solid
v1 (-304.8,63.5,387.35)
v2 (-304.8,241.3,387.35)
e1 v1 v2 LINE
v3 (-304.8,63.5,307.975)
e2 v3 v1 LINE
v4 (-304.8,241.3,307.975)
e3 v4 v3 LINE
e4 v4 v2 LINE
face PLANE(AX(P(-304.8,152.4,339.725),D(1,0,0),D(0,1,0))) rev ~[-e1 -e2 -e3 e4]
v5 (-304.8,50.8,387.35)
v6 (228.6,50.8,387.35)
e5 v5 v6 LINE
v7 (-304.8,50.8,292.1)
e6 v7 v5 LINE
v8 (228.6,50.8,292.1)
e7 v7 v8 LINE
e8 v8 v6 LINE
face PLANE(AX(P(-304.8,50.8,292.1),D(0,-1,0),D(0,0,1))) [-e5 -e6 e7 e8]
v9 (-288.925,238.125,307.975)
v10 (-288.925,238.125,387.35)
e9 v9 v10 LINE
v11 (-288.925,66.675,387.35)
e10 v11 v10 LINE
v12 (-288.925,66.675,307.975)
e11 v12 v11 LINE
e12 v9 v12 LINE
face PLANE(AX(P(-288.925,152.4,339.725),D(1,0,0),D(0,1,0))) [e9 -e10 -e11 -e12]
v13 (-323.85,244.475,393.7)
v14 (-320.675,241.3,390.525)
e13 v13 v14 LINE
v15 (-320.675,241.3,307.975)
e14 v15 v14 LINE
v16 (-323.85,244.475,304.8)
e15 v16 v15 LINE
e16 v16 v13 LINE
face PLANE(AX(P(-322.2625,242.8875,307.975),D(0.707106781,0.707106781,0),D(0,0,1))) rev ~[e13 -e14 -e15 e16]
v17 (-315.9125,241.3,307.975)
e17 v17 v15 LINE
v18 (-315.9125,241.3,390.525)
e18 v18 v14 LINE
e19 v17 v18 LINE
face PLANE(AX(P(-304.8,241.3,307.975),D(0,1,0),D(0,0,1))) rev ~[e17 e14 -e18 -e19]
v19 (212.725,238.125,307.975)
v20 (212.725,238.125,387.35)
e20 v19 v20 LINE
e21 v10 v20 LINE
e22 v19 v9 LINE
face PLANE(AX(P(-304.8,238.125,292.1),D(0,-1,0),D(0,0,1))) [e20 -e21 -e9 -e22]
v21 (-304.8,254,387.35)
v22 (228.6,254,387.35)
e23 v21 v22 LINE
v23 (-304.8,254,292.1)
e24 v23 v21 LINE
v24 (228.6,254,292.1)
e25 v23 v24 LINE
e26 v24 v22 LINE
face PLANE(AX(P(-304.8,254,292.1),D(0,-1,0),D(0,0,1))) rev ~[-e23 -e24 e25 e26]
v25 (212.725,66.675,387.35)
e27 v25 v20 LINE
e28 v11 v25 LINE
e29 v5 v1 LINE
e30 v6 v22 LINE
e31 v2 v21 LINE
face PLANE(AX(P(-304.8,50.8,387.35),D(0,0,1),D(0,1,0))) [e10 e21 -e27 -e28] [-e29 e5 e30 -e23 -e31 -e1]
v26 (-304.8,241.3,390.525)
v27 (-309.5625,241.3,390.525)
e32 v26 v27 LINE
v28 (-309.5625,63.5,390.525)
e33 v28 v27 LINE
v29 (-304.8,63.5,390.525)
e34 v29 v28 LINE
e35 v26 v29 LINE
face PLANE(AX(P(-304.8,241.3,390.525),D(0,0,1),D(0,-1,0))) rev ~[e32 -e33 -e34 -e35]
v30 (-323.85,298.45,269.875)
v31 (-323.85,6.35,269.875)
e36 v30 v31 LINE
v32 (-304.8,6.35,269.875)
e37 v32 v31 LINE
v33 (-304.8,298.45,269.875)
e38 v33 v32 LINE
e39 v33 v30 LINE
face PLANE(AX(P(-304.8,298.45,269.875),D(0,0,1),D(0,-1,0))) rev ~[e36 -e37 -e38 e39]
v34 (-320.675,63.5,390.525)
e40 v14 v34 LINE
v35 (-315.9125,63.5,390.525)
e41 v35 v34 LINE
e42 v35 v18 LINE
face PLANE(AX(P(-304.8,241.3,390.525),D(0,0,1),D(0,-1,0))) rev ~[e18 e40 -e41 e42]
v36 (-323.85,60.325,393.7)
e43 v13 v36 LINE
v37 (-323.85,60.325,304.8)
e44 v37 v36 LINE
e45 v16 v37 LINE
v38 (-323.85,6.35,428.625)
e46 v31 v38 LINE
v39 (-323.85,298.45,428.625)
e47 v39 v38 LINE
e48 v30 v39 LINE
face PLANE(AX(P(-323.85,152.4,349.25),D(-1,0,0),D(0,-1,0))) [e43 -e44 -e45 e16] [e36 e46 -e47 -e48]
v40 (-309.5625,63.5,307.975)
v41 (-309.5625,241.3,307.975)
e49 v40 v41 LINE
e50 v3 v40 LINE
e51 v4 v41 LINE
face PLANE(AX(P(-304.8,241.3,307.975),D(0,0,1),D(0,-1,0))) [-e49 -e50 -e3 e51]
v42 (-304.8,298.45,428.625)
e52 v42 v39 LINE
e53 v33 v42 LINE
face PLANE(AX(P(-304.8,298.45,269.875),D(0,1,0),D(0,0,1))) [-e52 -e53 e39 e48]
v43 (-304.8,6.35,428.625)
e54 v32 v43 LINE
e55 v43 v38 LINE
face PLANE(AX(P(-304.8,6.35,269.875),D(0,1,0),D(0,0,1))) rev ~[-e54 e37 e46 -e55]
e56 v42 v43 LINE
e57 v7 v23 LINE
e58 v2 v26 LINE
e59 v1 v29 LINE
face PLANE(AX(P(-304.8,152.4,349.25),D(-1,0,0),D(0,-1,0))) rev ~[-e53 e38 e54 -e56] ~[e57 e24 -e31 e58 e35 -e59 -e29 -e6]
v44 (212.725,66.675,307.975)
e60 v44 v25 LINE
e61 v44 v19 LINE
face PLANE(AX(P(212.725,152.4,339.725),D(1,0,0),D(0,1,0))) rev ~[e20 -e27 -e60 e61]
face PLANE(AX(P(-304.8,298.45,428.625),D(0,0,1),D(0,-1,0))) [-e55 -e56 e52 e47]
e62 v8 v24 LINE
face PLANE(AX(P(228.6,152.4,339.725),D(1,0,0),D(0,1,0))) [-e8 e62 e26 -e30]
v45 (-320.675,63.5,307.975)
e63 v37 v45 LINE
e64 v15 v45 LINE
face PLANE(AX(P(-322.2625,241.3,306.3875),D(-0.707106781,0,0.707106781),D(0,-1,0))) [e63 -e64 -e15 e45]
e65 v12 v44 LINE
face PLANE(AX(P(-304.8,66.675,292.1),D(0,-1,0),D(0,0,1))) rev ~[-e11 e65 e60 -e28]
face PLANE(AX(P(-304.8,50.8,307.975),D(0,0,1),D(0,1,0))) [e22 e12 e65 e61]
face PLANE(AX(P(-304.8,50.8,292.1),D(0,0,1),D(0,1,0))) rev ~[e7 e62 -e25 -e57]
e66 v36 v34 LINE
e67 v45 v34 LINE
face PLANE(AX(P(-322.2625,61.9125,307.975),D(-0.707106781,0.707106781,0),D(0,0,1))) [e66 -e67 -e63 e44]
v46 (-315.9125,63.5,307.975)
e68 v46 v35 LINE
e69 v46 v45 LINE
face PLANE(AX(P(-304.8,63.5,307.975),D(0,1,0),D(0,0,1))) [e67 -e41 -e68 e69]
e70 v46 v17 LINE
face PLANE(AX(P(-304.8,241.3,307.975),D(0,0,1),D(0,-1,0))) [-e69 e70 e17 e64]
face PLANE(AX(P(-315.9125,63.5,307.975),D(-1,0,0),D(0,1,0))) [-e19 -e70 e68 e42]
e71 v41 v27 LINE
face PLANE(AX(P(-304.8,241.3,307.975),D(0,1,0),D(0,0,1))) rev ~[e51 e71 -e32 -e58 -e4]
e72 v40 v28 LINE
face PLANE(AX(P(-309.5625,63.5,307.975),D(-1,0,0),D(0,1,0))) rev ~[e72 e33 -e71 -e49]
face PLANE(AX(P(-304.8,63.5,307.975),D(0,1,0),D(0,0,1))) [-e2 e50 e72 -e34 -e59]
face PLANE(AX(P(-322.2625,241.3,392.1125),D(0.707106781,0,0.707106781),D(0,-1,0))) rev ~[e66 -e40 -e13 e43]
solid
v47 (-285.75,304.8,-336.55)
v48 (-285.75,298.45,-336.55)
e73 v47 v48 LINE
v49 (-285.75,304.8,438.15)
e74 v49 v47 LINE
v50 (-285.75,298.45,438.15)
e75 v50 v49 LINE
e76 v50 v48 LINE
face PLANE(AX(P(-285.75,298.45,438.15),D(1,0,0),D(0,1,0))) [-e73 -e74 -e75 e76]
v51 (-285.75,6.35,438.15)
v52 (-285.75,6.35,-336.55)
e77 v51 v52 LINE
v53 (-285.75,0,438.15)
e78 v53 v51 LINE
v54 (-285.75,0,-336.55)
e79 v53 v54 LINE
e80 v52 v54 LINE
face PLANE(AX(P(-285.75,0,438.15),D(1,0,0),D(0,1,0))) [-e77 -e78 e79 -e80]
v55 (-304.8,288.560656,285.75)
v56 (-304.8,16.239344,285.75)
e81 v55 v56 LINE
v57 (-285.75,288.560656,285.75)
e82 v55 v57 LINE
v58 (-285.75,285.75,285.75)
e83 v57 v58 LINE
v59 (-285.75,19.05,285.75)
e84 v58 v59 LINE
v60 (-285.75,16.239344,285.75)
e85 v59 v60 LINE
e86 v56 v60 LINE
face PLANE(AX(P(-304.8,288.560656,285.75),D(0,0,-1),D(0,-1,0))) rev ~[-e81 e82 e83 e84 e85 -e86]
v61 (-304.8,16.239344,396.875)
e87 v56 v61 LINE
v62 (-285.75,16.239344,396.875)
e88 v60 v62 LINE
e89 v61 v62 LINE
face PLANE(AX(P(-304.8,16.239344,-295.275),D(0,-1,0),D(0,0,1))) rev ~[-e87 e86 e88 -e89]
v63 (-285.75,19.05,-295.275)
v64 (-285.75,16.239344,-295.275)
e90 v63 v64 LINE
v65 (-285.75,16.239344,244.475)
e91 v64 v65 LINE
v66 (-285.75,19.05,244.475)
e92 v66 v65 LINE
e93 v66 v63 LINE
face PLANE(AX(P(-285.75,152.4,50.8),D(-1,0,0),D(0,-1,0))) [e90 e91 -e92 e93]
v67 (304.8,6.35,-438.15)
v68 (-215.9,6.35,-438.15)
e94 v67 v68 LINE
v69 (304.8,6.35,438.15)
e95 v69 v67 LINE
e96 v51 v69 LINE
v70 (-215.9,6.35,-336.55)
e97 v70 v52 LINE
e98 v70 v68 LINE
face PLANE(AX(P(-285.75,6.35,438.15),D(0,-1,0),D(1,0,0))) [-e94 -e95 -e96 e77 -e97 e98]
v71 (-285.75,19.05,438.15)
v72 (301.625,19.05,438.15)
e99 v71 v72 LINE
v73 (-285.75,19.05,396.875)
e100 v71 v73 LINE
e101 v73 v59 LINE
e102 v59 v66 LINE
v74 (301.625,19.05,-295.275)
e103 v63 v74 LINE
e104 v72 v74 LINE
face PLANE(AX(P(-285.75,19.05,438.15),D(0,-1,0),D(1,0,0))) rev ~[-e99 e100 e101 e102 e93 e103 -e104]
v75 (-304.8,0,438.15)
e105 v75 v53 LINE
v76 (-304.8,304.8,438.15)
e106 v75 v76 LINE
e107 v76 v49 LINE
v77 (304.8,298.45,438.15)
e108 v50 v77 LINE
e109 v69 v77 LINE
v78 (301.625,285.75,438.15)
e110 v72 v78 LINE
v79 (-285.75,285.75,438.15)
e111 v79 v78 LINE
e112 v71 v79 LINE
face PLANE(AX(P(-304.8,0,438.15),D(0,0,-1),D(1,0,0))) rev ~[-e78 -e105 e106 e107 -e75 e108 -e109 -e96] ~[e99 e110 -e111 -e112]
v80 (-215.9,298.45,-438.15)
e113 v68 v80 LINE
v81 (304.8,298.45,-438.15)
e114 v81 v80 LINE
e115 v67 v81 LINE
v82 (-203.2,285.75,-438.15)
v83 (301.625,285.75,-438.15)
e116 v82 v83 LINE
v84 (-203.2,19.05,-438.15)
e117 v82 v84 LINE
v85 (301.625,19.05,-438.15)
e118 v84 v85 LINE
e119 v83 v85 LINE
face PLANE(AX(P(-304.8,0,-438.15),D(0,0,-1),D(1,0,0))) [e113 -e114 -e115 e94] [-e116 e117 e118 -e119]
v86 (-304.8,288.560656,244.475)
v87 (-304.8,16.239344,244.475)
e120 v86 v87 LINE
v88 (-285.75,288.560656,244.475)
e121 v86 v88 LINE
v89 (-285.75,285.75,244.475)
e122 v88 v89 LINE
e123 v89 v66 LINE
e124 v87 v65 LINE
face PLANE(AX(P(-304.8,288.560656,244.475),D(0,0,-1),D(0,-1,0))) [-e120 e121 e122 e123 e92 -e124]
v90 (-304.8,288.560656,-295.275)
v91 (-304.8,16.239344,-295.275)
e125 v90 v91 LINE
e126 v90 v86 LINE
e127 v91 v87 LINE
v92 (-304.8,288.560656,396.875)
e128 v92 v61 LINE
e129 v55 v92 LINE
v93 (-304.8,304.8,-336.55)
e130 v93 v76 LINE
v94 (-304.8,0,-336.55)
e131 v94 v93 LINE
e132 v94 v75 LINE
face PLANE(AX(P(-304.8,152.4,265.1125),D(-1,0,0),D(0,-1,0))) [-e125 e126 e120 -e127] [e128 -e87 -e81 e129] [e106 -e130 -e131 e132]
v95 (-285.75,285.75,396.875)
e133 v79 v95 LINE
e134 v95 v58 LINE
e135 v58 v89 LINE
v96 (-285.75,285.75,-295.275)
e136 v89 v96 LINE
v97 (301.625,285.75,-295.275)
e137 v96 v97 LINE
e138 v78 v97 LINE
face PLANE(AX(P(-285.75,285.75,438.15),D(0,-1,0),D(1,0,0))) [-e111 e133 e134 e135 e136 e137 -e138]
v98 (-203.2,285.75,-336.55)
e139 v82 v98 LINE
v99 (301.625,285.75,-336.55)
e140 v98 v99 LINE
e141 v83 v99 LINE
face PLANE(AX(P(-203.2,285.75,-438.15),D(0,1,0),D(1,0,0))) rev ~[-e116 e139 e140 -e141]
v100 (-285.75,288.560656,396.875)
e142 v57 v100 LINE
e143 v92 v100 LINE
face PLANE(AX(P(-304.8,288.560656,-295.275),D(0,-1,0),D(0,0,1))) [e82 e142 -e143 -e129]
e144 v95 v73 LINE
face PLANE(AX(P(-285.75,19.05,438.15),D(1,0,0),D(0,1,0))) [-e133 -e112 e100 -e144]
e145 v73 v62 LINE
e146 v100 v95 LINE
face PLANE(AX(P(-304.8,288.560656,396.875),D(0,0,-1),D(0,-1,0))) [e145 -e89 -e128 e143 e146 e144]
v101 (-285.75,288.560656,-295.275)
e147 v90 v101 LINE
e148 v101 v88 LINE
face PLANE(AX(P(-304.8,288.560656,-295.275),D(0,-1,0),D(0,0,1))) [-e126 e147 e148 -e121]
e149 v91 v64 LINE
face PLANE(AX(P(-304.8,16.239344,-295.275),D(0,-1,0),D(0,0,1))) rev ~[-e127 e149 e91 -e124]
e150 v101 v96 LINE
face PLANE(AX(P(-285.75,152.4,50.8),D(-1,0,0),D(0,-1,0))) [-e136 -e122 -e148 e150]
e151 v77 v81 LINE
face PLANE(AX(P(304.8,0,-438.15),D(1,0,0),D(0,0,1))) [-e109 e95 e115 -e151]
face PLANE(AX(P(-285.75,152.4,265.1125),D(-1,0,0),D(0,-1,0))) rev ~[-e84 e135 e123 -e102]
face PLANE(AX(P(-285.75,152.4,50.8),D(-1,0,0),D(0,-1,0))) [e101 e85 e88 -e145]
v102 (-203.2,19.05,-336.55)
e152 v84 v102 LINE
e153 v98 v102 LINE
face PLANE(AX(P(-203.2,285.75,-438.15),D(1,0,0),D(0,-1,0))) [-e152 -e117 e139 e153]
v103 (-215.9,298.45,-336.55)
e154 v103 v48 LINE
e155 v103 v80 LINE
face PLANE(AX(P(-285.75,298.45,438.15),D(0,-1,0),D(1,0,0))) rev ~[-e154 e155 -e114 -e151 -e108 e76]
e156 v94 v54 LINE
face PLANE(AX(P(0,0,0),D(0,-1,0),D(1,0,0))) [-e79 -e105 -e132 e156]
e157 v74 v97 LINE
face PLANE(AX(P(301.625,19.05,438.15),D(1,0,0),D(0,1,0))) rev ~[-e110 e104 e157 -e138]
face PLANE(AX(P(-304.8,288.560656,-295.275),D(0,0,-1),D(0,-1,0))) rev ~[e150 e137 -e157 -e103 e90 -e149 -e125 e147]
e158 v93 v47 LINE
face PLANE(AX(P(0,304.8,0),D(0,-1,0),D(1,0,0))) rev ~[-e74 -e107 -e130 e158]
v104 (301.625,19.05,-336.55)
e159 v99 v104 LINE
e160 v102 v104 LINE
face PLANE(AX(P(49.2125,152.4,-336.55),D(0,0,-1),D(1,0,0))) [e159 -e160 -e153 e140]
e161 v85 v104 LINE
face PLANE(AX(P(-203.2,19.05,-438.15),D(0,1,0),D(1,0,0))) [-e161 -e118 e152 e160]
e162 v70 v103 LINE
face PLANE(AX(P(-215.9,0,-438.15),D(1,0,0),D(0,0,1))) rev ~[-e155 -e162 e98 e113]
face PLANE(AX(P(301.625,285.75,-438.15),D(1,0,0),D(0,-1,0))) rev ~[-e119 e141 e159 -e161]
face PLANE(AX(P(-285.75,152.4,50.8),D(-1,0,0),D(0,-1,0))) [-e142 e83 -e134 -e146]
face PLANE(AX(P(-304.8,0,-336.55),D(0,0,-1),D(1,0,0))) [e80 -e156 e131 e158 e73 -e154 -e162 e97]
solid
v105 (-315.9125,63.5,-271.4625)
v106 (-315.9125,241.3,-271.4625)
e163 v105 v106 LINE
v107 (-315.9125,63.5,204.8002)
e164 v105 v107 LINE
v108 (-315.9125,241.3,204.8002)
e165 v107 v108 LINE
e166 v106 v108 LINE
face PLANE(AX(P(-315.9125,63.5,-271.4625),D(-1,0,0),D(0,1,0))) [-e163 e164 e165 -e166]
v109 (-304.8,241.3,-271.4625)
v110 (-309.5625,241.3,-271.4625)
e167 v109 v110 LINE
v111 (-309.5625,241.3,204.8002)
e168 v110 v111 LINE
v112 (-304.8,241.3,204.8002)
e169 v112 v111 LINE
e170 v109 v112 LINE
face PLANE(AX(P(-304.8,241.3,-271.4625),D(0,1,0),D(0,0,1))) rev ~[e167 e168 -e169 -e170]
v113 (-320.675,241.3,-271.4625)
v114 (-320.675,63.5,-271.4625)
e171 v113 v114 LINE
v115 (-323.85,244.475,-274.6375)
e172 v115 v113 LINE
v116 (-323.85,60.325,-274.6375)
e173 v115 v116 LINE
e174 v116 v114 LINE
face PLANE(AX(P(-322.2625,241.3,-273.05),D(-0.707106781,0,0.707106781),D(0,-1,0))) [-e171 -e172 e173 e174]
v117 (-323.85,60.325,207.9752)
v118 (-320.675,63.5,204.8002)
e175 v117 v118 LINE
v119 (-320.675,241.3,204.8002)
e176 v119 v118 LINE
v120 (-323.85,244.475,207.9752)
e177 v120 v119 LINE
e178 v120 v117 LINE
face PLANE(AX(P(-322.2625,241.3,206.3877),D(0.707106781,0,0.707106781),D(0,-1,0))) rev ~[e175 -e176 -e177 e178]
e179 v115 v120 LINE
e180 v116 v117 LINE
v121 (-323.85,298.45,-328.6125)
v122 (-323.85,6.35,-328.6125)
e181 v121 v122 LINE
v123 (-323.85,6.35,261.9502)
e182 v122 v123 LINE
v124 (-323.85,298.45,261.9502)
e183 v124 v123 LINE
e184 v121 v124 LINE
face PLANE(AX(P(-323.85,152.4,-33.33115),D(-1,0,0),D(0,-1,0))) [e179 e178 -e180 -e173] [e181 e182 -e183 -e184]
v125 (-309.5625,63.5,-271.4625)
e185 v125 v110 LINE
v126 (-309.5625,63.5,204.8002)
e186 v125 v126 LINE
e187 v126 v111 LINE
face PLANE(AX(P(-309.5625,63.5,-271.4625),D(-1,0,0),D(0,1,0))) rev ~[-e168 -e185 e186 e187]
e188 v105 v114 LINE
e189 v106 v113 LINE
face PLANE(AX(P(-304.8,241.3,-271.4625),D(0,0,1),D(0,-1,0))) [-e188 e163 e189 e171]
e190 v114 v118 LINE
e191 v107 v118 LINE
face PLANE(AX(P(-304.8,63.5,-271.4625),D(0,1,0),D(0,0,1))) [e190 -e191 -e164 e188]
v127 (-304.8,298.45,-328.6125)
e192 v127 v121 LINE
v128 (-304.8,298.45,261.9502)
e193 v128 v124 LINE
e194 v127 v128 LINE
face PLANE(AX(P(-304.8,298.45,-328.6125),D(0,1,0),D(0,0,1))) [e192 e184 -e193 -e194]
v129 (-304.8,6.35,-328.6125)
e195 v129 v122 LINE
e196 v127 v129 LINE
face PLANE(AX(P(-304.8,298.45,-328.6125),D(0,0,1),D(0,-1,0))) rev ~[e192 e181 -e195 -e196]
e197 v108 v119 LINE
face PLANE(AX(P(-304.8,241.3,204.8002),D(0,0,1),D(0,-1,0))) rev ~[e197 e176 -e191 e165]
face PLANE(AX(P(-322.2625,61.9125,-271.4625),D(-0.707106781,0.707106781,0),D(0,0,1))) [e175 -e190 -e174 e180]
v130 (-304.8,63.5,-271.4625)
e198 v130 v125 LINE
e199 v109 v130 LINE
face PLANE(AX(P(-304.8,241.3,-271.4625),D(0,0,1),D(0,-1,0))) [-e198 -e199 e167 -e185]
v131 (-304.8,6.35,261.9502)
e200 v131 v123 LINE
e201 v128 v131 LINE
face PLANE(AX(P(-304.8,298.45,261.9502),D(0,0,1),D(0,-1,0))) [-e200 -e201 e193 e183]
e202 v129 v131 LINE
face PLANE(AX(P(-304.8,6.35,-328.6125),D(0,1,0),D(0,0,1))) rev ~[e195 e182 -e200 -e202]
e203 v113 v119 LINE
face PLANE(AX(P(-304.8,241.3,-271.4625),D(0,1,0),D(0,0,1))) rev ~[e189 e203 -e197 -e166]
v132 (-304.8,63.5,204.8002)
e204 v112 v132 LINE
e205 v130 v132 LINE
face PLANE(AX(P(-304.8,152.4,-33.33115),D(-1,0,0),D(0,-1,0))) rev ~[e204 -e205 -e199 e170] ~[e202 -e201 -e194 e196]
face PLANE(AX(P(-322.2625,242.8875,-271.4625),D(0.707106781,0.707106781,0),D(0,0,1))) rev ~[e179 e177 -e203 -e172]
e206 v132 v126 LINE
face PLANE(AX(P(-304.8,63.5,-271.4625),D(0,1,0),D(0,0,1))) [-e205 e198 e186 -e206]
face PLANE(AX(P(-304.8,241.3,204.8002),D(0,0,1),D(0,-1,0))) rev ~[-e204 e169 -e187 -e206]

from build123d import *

# Parameters (mm, degrees)
F0_W          = 609.6
F0_H          = 876.3
F1_DEPTH      = 304.8
F2_W          = 88.9
F2_H          = 101.6
F3_DEPTH      = 304.801
F4_W          = 272.3213114754
F4_H          = 692.15
F5_DEPTH      = 19.05
F6_W          = 590.55
F6_H          = 6.35
F7_DEPTH      = 876.301
F8_W          = 587.375
F8_H          = 266.7
F9_DEPTH      = 733.425
F10_W         = 272.3213114754
F10_H         = 41.275
F11_DEPTH     = 19.05
F12_W         = 292.1
F12_H         = 590.5627
F12_W_2       = 177.8
F12_H_2       = 476.2627
F13_DEPTH     = 19.05
F14_W         = 6.35
F14_H         = 177.8
F15_DEPTH     = 476.2627
F16_SIZE      = 3.175
F17_W         = 292.1
F17_H         = 158.75
F17_W_2       = 177.8
F17_H_2       = 82.55
F18_DEPTH     = 19.05
F19_W         = 6.35
F19_H         = 177.8
F20_DEPTH     = 82.55
F21_SIZE      = 3.175
F22_W         = 504.825
F22_H         = 266.7
F23_DEPTH     = 101.6
F24_W         = 203.2
F24_H         = 95.25
F25_DEPTH     = 533.4
F26_T         = 15.875
F26_T3_DEPTH  = 37.249261314
F26_T5_DEPTH  = 37.249261314
F26_T7_DEPTH  = 37.249261314
F26_T9_DEPTH  = 37.249261314
F26_T11_DEPTH = 36.5125
F26_T13_DEPTH = 209.55
F26_T15_DEPTH = 114.3
F26_T17_DEPTH = 127
F26_T19_DEPTH = 234.95
F26_T21_DEPTH = 111.125
F26_T23_DEPTH = 36.5125


# Not quite as in the source:
# - a shell that OpenCascade refuses in one call is made with other operations: the cavity is built on its own and cut out


with BuildPart() as f1:
    # F0 (on Front) → F1 (new body)
    with BuildSketch(Plane.XZ):
        Rectangle(F0_W, F0_H)
    extrude(amount=-F1_DEPTH)

    # F2 (on face) → F3 (cut, through all)
    with BuildSketch(Plane.XZ):
        with Locations((-260.35, -387.35)):
            Rectangle(F2_W, F2_H)
    extrude(amount=-F3_DEPTH, mode=Mode.SUBTRACT)

    # F4 (on face) → F5 (cut)
    with BuildSketch(Plane(origin=(-304.8, 0, 0), x_dir=(0, -1, 0), z_dir=(-1, 0, 0))):
        with Locations((-152.4, 50.8)):
            Rectangle(F4_W, F4_H)
    extrude(amount=-F5_DEPTH, mode=Mode.SUBTRACT)

    # F6 (on face) → F7 (cut, through all)
    with BuildSketch(Plane.XY.offset(438.15)):
        with Locations((9.525, 301.625)):
            Rectangle(F6_W, F6_H)
        with Locations((9.525, 3.175)):
            Rectangle(F6_W, F6_H)
    extrude(amount=-F7_DEPTH, mode=Mode.SUBTRACT)

    # F8 (on face) → F9 (cut, through all)
    with BuildSketch(Plane.XY.offset(438.15)):
        with Locations((7.9375, 152.4)):
            Rectangle(F8_W, F8_H)
    extrude(amount=-F9_DEPTH, mode=Mode.SUBTRACT)

    # F10 (on face) → F11 (join, through all)
    with BuildSketch(Plane(origin=(-304.8, 0, 0), x_dir=(0, -1, 0), z_dir=(-1, 0, 0))):
        with Locations((-152.4, 265.1125)):
            Rectangle(F10_W, F10_H)
    extrude(amount=-F11_DEPTH)

    # F22 (on face) → F23 (cut)
    with BuildSketch(Plane(origin=(0, 0, -438.15), x_dir=(1, 0, 0), z_dir=(0, 0, -1))):
        with Locations((49.2125, -152.4)):
            Rectangle(F22_W, F22_H)
    extrude(amount=-F23_DEPTH, mode=Mode.SUBTRACT)


with BuildPart() as f13:
    # F12 (on face) → F13 (new body)
    with BuildSketch(Plane(origin=(-304.8, 0, 0), x_dir=(0, -1, 0), z_dir=(-1, 0, 0))):
        with Locations((-152.4, -33.33115)):
            Rectangle(F12_W, F12_H)
        with Locations((-152.4, -33.33115)):
            Rectangle(F12_W_2, F12_H_2, mode=Mode.SUBTRACT)
    extrude(amount=F13_DEPTH)

    # F14 (on face) → F15 (join, through all)
    with BuildSketch(Plane.XY.offset(-271.4625)):
        with Locations((-312.7375, 152.4)):
            Rectangle(F14_W, F14_H)
    extrude(amount=F15_DEPTH)

    # F16
    f16_edges = [f13.edges().sort_by_distance(p)[0] for p in [
        (-323.85, 241.3, -33.33115),
        (-323.85, 152.4, -271.4625),
        (-323.85, 63.5, -33.33115),
        (-323.85, 152.4, 204.8002),
    ]]
    chamfer(f16_edges, length=F16_SIZE)


with BuildPart() as f18:
    # F17 (on face) → F18 (new body)
    with BuildSketch(Plane(origin=(-304.8, 0, 0), x_dir=(0, -1, 0), z_dir=(-1, 0, 0))):
        with Locations((-152.4, 349.25)):
            Rectangle(F17_W, F17_H)
        with Locations((-152.4, 349.25)):
            Rectangle(F17_W_2, F17_H_2, mode=Mode.SUBTRACT)
    extrude(amount=F18_DEPTH)

    # F19 (on face) → F20 (join, through all)
    with BuildSketch(Plane.XY.offset(307.975)):
        with Locations((-312.7375, 152.4)):
            Rectangle(F19_W, F19_H)
    extrude(amount=F20_DEPTH)

    # F21
    f21_edges = [f18.edges().sort_by_distance(p)[0] for p in [
        (-323.85, 152.4, 307.975),
        (-323.85, 241.3, 349.25),
        (-323.85, 152.4, 390.525),
        (-323.85, 63.5, 349.25),
    ]]
    chamfer(f21_edges, length=F21_SIZE)

    # F24 (on face) → F25 (join)
    with BuildSketch(Plane.YZ.offset(-304.8)):
        with Locations((152.4, 339.725)):
            Rectangle(F24_W, F24_H)
    extrude(amount=F25_DEPTH)

    # F26: shell of thickness 15.875, made by hand


with BuildPart() as f26_core1:
    # F26_t2: copy of F18
    add(f18.part)

    # the walls: a layer under each face that stays
    f26_faces = [f26_core1.faces().sort_by_distance(p)[0] for p in [
        (-323.85, 249.7666666667, 296.3333333333),
        (-322.2625, 152.4, 306.3875),
        (-322.2625, 61.9125, 349.25),
        (-322.2625, 242.8875, 349.25),
        (-322.2625, 152.4, 392.1125),
        (-314.325, 152.4, 428.625),
        (-314.325, 298.45, 349.25),
        (-314.325, 152.4, 269.875),
        (-314.325, 6.35, 349.25),
        (-318.29375, 152.4, 307.975),
        (-318.29375, 63.5, 349.25),
        (-318.29375, 241.3, 349.25),
        (-318.29375, 152.4, 390.525),
        (-304.8, 249.7666666667, 402.1666666667),
        (-315.9125, 152.4, 349.25),
        (-38.1, 254, 339.725),
        (-38.1, 152.4, 292.1),
        (-38.1, 50.8, 339.725),
        (-307.18125, 63.5, 349.25),
        (-307.18125, 152.4, 390.525),
        (-307.18125, 241.3, 349.25),
        (-304.8, 152.4, 347.6625),
        (228.6, 152.4, 339.725),
        (-307.18125, 152.4, 307.975),
        (-309.5625, 152.4, 349.25),
    ]]
    thicken(f26_faces, amount=-F26_T, mode=Mode.SUBTRACT)

    # F26_s4 → F26_t3 (cut)
    with BuildSketch(Plane(origin=(4.5928978099, 4.5928978099, 4.5928978099), x_dir=(-0.7071067812, 0.7071067812, 0), z_dir=(0.5773502692, 0.5773502692, 0.5773502692))):
        Polygon((271.8908726623, 356.5892701441), (263.7152476623, 342.7036353262), (255.7777476623, 347.2863530879), (255.7777476623, 356.4517886113), align=None)
    extrude(amount=F26_T3_DEPTH, mode=Mode.SUBTRACT)

    # F26_s6 → F26_t5 (cut)
    with BuildSketch(Plane(origin=(-97.0071021901, 97.0071021901, -97.0071021901), x_dir=(0.7071067812, 0.7071067812, 0), z_dir=(0.5773502692, -0.5773502692, 0.5773502692))):
        Polygon((-56.3647257567, 481.0233490775), (-48.1891007567, 467.1377142596), (-40.2516007567, 471.7204320213), (-40.2516007567, 480.8858675446), align=None)
    extrude(amount=F26_T5_DEPTH, mode=Mode.SUBTRACT)

    # F26_s8 → F26_t7 (cut)
    with BuildSketch(Plane(origin=(-228.2404355234, -228.2404355234, 228.2404355234), x_dir=(-0.7071067812, 0.7071067812, 0), z_dir=(0.5773502692, 0.5773502692, -0.5773502692))):
        Polygon((271.8908726623, 213.7335916339), (255.7777476623, 213.8710731668), (255.7777476623, 223.0365086901), (263.7152476623, 227.6192264518), align=None)
    extrude(amount=F26_T7_DEPTH, mode=Mode.SUBTRACT)

    # F26_s10 → F26_t9 (cut)
    with BuildSketch(Plane(origin=(-329.8404355234, 329.8404355234, 329.8404355234), x_dir=(0.7071067812, 0.7071067812, 0), z_dir=(0.5773502692, -0.5773502692, -0.5773502692))):
        Polygon((-56.3647257567, 89.2995127005), (-40.2516007567, 89.4369942334), (-40.2516007567, 98.6024297568), (-48.1891007567, 103.1851475184), align=None)
    extrude(amount=F26_T9_DEPTH, mode=Mode.SUBTRACT)

    # F26_s12 → F26_t11 (cut)
    with BuildSketch(Plane.YZ.offset(-336.55)):
        Polygon((241.14125, 308.13375), (241.3, 292.1), (257.175, 292.1), (257.175, 307.975), align=None)
        Polygon((63.65875, 308.13375), (63.5, 292.1), (47.625, 292.1), (47.625, 307.975), align=None)
        Polygon((63.65875, 390.36625), (47.625, 390.525), (47.625, 406.4), (63.5, 406.4), align=None)
        Polygon((241.14125, 390.36625), (257.175, 390.525), (257.175, 406.4), (241.3, 406.4), align=None)
    extrude(amount=F26_T11_DEPTH, mode=Mode.SUBTRACT)

    # F26_s14 → F26_t13 (cut)
    with BuildSketch(Plane.XZ.offset(-257.175)):
        Polygon((-316.07125, 308.13375), (-315.9125, 292.1), (-300.0375, 292.1), (-300.0375, 307.975), align=None)
        Polygon((-316.07125, 390.36625), (-315.9125, 406.4), (-300.0375, 406.4), (-300.0375, 390.525), align=None)
        Polygon((-309.40375, 390.36625), (-309.5625, 406.4), (-325.4375, 406.4), (-325.4375, 390.525), align=None)
        Polygon((-304.95875, 308.13375), (-288.925, 307.975), (-288.925, 292.1), (-304.8, 292.1), align=None)
        Polygon((-309.40375, 308.13375), (-309.5625, 292.1), (-325.4375, 292.1), (-325.4375, 307.975), align=None)
    extrude(amount=F26_T13_DEPTH, mode=Mode.SUBTRACT)

    # F26_s16 → F26_t15 (cut)
    with BuildSketch(Plane.XY.offset(292.1)):
        Polygon((-316.07125, 63.65875), (-315.9125, 47.625), (-300.0375, 47.625), (-300.0375, 63.5), align=None)
        Polygon((-316.07125, 241.14125), (-315.9125, 257.175), (-300.0375, 257.175), (-300.0375, 241.3), align=None)
        Polygon((-309.40375, 63.65875), (-309.5625, 47.625), (-325.4375, 47.625), (-325.4375, 63.5), align=None)
        Polygon((-309.40375, 241.14125), (-309.5625, 257.175), (-325.4375, 257.175), (-325.4375, 241.3), align=None)
    extrude(amount=F26_T15_DEPTH, mode=Mode.SUBTRACT)

    # F26_s18 → F26_t17 (cut)
    with BuildSketch(Plane.XY.offset(276.225)):
        Polygon((-304.64125, 254.15875), (-320.675, 254), (-320.675, 238.125), (-304.8, 238.125), align=None)
        Polygon((-304.64125, 50.64125), (-320.675, 50.8), (-320.675, 66.675), (-304.8, 66.675), align=None)
    extrude(amount=F26_T17_DEPTH, mode=Mode.SUBTRACT)

    # F26_s20 → F26_t19 (cut)
    with BuildSketch(Plane.XZ.offset(-269.875)):
        Polygon((-304.64125, 291.94125), (-320.675, 292.1), (-320.675, 307.975), (-304.8, 307.975), align=None)
    extrude(amount=F26_T19_DEPTH, mode=Mode.SUBTRACT)

    # F26_s22 → F26_t21 (cut)
    with BuildSketch(Plane.XY.offset(292.1)):
        Polygon((-304.95875, 63.65875), (-304.8, 47.625), (-288.925, 47.625), (-288.925, 63.5), align=None)
        Polygon((-304.95875, 241.14125), (-304.8, 257.175), (-288.925, 257.175), (-288.925, 241.3), align=None)
    extrude(amount=F26_T21_DEPTH, mode=Mode.SUBTRACT)

    # F26_s24 → F26_t23 (cut)
    with BuildSketch(Plane.YZ.offset(-325.4375)):
        Polygon((63.65875, 308.13375), (47.625, 307.975), (47.625, 292.1), (63.5, 292.1), align=None)
        Polygon((63.65875, 390.36625), (47.625, 390.525), (47.625, 406.4), (63.5, 406.4), align=None)
        Polygon((241.14125, 390.36625), (241.3, 406.4), (257.175, 406.4), (257.175, 390.525), align=None)
        Polygon((241.14125, 308.13375), (257.175, 307.975), (257.175, 292.1), (241.3, 292.1), align=None)
    extrude(amount=F26_T23_DEPTH, mode=Mode.SUBTRACT)


with BuildPart() as f18_1:
    add(f18.part)

    # what is left inside the walls is the cavity
    f26_cavity = [f26_core1.part.solids().sort_by_distance(p)[0] for p in [
        (45.508333, 152.4, 308.13375),
    ]]
    add(f26_cavity, mode=Mode.SUBTRACT)


solid = Compound([f1.part, f13.part, f18_1.part])
